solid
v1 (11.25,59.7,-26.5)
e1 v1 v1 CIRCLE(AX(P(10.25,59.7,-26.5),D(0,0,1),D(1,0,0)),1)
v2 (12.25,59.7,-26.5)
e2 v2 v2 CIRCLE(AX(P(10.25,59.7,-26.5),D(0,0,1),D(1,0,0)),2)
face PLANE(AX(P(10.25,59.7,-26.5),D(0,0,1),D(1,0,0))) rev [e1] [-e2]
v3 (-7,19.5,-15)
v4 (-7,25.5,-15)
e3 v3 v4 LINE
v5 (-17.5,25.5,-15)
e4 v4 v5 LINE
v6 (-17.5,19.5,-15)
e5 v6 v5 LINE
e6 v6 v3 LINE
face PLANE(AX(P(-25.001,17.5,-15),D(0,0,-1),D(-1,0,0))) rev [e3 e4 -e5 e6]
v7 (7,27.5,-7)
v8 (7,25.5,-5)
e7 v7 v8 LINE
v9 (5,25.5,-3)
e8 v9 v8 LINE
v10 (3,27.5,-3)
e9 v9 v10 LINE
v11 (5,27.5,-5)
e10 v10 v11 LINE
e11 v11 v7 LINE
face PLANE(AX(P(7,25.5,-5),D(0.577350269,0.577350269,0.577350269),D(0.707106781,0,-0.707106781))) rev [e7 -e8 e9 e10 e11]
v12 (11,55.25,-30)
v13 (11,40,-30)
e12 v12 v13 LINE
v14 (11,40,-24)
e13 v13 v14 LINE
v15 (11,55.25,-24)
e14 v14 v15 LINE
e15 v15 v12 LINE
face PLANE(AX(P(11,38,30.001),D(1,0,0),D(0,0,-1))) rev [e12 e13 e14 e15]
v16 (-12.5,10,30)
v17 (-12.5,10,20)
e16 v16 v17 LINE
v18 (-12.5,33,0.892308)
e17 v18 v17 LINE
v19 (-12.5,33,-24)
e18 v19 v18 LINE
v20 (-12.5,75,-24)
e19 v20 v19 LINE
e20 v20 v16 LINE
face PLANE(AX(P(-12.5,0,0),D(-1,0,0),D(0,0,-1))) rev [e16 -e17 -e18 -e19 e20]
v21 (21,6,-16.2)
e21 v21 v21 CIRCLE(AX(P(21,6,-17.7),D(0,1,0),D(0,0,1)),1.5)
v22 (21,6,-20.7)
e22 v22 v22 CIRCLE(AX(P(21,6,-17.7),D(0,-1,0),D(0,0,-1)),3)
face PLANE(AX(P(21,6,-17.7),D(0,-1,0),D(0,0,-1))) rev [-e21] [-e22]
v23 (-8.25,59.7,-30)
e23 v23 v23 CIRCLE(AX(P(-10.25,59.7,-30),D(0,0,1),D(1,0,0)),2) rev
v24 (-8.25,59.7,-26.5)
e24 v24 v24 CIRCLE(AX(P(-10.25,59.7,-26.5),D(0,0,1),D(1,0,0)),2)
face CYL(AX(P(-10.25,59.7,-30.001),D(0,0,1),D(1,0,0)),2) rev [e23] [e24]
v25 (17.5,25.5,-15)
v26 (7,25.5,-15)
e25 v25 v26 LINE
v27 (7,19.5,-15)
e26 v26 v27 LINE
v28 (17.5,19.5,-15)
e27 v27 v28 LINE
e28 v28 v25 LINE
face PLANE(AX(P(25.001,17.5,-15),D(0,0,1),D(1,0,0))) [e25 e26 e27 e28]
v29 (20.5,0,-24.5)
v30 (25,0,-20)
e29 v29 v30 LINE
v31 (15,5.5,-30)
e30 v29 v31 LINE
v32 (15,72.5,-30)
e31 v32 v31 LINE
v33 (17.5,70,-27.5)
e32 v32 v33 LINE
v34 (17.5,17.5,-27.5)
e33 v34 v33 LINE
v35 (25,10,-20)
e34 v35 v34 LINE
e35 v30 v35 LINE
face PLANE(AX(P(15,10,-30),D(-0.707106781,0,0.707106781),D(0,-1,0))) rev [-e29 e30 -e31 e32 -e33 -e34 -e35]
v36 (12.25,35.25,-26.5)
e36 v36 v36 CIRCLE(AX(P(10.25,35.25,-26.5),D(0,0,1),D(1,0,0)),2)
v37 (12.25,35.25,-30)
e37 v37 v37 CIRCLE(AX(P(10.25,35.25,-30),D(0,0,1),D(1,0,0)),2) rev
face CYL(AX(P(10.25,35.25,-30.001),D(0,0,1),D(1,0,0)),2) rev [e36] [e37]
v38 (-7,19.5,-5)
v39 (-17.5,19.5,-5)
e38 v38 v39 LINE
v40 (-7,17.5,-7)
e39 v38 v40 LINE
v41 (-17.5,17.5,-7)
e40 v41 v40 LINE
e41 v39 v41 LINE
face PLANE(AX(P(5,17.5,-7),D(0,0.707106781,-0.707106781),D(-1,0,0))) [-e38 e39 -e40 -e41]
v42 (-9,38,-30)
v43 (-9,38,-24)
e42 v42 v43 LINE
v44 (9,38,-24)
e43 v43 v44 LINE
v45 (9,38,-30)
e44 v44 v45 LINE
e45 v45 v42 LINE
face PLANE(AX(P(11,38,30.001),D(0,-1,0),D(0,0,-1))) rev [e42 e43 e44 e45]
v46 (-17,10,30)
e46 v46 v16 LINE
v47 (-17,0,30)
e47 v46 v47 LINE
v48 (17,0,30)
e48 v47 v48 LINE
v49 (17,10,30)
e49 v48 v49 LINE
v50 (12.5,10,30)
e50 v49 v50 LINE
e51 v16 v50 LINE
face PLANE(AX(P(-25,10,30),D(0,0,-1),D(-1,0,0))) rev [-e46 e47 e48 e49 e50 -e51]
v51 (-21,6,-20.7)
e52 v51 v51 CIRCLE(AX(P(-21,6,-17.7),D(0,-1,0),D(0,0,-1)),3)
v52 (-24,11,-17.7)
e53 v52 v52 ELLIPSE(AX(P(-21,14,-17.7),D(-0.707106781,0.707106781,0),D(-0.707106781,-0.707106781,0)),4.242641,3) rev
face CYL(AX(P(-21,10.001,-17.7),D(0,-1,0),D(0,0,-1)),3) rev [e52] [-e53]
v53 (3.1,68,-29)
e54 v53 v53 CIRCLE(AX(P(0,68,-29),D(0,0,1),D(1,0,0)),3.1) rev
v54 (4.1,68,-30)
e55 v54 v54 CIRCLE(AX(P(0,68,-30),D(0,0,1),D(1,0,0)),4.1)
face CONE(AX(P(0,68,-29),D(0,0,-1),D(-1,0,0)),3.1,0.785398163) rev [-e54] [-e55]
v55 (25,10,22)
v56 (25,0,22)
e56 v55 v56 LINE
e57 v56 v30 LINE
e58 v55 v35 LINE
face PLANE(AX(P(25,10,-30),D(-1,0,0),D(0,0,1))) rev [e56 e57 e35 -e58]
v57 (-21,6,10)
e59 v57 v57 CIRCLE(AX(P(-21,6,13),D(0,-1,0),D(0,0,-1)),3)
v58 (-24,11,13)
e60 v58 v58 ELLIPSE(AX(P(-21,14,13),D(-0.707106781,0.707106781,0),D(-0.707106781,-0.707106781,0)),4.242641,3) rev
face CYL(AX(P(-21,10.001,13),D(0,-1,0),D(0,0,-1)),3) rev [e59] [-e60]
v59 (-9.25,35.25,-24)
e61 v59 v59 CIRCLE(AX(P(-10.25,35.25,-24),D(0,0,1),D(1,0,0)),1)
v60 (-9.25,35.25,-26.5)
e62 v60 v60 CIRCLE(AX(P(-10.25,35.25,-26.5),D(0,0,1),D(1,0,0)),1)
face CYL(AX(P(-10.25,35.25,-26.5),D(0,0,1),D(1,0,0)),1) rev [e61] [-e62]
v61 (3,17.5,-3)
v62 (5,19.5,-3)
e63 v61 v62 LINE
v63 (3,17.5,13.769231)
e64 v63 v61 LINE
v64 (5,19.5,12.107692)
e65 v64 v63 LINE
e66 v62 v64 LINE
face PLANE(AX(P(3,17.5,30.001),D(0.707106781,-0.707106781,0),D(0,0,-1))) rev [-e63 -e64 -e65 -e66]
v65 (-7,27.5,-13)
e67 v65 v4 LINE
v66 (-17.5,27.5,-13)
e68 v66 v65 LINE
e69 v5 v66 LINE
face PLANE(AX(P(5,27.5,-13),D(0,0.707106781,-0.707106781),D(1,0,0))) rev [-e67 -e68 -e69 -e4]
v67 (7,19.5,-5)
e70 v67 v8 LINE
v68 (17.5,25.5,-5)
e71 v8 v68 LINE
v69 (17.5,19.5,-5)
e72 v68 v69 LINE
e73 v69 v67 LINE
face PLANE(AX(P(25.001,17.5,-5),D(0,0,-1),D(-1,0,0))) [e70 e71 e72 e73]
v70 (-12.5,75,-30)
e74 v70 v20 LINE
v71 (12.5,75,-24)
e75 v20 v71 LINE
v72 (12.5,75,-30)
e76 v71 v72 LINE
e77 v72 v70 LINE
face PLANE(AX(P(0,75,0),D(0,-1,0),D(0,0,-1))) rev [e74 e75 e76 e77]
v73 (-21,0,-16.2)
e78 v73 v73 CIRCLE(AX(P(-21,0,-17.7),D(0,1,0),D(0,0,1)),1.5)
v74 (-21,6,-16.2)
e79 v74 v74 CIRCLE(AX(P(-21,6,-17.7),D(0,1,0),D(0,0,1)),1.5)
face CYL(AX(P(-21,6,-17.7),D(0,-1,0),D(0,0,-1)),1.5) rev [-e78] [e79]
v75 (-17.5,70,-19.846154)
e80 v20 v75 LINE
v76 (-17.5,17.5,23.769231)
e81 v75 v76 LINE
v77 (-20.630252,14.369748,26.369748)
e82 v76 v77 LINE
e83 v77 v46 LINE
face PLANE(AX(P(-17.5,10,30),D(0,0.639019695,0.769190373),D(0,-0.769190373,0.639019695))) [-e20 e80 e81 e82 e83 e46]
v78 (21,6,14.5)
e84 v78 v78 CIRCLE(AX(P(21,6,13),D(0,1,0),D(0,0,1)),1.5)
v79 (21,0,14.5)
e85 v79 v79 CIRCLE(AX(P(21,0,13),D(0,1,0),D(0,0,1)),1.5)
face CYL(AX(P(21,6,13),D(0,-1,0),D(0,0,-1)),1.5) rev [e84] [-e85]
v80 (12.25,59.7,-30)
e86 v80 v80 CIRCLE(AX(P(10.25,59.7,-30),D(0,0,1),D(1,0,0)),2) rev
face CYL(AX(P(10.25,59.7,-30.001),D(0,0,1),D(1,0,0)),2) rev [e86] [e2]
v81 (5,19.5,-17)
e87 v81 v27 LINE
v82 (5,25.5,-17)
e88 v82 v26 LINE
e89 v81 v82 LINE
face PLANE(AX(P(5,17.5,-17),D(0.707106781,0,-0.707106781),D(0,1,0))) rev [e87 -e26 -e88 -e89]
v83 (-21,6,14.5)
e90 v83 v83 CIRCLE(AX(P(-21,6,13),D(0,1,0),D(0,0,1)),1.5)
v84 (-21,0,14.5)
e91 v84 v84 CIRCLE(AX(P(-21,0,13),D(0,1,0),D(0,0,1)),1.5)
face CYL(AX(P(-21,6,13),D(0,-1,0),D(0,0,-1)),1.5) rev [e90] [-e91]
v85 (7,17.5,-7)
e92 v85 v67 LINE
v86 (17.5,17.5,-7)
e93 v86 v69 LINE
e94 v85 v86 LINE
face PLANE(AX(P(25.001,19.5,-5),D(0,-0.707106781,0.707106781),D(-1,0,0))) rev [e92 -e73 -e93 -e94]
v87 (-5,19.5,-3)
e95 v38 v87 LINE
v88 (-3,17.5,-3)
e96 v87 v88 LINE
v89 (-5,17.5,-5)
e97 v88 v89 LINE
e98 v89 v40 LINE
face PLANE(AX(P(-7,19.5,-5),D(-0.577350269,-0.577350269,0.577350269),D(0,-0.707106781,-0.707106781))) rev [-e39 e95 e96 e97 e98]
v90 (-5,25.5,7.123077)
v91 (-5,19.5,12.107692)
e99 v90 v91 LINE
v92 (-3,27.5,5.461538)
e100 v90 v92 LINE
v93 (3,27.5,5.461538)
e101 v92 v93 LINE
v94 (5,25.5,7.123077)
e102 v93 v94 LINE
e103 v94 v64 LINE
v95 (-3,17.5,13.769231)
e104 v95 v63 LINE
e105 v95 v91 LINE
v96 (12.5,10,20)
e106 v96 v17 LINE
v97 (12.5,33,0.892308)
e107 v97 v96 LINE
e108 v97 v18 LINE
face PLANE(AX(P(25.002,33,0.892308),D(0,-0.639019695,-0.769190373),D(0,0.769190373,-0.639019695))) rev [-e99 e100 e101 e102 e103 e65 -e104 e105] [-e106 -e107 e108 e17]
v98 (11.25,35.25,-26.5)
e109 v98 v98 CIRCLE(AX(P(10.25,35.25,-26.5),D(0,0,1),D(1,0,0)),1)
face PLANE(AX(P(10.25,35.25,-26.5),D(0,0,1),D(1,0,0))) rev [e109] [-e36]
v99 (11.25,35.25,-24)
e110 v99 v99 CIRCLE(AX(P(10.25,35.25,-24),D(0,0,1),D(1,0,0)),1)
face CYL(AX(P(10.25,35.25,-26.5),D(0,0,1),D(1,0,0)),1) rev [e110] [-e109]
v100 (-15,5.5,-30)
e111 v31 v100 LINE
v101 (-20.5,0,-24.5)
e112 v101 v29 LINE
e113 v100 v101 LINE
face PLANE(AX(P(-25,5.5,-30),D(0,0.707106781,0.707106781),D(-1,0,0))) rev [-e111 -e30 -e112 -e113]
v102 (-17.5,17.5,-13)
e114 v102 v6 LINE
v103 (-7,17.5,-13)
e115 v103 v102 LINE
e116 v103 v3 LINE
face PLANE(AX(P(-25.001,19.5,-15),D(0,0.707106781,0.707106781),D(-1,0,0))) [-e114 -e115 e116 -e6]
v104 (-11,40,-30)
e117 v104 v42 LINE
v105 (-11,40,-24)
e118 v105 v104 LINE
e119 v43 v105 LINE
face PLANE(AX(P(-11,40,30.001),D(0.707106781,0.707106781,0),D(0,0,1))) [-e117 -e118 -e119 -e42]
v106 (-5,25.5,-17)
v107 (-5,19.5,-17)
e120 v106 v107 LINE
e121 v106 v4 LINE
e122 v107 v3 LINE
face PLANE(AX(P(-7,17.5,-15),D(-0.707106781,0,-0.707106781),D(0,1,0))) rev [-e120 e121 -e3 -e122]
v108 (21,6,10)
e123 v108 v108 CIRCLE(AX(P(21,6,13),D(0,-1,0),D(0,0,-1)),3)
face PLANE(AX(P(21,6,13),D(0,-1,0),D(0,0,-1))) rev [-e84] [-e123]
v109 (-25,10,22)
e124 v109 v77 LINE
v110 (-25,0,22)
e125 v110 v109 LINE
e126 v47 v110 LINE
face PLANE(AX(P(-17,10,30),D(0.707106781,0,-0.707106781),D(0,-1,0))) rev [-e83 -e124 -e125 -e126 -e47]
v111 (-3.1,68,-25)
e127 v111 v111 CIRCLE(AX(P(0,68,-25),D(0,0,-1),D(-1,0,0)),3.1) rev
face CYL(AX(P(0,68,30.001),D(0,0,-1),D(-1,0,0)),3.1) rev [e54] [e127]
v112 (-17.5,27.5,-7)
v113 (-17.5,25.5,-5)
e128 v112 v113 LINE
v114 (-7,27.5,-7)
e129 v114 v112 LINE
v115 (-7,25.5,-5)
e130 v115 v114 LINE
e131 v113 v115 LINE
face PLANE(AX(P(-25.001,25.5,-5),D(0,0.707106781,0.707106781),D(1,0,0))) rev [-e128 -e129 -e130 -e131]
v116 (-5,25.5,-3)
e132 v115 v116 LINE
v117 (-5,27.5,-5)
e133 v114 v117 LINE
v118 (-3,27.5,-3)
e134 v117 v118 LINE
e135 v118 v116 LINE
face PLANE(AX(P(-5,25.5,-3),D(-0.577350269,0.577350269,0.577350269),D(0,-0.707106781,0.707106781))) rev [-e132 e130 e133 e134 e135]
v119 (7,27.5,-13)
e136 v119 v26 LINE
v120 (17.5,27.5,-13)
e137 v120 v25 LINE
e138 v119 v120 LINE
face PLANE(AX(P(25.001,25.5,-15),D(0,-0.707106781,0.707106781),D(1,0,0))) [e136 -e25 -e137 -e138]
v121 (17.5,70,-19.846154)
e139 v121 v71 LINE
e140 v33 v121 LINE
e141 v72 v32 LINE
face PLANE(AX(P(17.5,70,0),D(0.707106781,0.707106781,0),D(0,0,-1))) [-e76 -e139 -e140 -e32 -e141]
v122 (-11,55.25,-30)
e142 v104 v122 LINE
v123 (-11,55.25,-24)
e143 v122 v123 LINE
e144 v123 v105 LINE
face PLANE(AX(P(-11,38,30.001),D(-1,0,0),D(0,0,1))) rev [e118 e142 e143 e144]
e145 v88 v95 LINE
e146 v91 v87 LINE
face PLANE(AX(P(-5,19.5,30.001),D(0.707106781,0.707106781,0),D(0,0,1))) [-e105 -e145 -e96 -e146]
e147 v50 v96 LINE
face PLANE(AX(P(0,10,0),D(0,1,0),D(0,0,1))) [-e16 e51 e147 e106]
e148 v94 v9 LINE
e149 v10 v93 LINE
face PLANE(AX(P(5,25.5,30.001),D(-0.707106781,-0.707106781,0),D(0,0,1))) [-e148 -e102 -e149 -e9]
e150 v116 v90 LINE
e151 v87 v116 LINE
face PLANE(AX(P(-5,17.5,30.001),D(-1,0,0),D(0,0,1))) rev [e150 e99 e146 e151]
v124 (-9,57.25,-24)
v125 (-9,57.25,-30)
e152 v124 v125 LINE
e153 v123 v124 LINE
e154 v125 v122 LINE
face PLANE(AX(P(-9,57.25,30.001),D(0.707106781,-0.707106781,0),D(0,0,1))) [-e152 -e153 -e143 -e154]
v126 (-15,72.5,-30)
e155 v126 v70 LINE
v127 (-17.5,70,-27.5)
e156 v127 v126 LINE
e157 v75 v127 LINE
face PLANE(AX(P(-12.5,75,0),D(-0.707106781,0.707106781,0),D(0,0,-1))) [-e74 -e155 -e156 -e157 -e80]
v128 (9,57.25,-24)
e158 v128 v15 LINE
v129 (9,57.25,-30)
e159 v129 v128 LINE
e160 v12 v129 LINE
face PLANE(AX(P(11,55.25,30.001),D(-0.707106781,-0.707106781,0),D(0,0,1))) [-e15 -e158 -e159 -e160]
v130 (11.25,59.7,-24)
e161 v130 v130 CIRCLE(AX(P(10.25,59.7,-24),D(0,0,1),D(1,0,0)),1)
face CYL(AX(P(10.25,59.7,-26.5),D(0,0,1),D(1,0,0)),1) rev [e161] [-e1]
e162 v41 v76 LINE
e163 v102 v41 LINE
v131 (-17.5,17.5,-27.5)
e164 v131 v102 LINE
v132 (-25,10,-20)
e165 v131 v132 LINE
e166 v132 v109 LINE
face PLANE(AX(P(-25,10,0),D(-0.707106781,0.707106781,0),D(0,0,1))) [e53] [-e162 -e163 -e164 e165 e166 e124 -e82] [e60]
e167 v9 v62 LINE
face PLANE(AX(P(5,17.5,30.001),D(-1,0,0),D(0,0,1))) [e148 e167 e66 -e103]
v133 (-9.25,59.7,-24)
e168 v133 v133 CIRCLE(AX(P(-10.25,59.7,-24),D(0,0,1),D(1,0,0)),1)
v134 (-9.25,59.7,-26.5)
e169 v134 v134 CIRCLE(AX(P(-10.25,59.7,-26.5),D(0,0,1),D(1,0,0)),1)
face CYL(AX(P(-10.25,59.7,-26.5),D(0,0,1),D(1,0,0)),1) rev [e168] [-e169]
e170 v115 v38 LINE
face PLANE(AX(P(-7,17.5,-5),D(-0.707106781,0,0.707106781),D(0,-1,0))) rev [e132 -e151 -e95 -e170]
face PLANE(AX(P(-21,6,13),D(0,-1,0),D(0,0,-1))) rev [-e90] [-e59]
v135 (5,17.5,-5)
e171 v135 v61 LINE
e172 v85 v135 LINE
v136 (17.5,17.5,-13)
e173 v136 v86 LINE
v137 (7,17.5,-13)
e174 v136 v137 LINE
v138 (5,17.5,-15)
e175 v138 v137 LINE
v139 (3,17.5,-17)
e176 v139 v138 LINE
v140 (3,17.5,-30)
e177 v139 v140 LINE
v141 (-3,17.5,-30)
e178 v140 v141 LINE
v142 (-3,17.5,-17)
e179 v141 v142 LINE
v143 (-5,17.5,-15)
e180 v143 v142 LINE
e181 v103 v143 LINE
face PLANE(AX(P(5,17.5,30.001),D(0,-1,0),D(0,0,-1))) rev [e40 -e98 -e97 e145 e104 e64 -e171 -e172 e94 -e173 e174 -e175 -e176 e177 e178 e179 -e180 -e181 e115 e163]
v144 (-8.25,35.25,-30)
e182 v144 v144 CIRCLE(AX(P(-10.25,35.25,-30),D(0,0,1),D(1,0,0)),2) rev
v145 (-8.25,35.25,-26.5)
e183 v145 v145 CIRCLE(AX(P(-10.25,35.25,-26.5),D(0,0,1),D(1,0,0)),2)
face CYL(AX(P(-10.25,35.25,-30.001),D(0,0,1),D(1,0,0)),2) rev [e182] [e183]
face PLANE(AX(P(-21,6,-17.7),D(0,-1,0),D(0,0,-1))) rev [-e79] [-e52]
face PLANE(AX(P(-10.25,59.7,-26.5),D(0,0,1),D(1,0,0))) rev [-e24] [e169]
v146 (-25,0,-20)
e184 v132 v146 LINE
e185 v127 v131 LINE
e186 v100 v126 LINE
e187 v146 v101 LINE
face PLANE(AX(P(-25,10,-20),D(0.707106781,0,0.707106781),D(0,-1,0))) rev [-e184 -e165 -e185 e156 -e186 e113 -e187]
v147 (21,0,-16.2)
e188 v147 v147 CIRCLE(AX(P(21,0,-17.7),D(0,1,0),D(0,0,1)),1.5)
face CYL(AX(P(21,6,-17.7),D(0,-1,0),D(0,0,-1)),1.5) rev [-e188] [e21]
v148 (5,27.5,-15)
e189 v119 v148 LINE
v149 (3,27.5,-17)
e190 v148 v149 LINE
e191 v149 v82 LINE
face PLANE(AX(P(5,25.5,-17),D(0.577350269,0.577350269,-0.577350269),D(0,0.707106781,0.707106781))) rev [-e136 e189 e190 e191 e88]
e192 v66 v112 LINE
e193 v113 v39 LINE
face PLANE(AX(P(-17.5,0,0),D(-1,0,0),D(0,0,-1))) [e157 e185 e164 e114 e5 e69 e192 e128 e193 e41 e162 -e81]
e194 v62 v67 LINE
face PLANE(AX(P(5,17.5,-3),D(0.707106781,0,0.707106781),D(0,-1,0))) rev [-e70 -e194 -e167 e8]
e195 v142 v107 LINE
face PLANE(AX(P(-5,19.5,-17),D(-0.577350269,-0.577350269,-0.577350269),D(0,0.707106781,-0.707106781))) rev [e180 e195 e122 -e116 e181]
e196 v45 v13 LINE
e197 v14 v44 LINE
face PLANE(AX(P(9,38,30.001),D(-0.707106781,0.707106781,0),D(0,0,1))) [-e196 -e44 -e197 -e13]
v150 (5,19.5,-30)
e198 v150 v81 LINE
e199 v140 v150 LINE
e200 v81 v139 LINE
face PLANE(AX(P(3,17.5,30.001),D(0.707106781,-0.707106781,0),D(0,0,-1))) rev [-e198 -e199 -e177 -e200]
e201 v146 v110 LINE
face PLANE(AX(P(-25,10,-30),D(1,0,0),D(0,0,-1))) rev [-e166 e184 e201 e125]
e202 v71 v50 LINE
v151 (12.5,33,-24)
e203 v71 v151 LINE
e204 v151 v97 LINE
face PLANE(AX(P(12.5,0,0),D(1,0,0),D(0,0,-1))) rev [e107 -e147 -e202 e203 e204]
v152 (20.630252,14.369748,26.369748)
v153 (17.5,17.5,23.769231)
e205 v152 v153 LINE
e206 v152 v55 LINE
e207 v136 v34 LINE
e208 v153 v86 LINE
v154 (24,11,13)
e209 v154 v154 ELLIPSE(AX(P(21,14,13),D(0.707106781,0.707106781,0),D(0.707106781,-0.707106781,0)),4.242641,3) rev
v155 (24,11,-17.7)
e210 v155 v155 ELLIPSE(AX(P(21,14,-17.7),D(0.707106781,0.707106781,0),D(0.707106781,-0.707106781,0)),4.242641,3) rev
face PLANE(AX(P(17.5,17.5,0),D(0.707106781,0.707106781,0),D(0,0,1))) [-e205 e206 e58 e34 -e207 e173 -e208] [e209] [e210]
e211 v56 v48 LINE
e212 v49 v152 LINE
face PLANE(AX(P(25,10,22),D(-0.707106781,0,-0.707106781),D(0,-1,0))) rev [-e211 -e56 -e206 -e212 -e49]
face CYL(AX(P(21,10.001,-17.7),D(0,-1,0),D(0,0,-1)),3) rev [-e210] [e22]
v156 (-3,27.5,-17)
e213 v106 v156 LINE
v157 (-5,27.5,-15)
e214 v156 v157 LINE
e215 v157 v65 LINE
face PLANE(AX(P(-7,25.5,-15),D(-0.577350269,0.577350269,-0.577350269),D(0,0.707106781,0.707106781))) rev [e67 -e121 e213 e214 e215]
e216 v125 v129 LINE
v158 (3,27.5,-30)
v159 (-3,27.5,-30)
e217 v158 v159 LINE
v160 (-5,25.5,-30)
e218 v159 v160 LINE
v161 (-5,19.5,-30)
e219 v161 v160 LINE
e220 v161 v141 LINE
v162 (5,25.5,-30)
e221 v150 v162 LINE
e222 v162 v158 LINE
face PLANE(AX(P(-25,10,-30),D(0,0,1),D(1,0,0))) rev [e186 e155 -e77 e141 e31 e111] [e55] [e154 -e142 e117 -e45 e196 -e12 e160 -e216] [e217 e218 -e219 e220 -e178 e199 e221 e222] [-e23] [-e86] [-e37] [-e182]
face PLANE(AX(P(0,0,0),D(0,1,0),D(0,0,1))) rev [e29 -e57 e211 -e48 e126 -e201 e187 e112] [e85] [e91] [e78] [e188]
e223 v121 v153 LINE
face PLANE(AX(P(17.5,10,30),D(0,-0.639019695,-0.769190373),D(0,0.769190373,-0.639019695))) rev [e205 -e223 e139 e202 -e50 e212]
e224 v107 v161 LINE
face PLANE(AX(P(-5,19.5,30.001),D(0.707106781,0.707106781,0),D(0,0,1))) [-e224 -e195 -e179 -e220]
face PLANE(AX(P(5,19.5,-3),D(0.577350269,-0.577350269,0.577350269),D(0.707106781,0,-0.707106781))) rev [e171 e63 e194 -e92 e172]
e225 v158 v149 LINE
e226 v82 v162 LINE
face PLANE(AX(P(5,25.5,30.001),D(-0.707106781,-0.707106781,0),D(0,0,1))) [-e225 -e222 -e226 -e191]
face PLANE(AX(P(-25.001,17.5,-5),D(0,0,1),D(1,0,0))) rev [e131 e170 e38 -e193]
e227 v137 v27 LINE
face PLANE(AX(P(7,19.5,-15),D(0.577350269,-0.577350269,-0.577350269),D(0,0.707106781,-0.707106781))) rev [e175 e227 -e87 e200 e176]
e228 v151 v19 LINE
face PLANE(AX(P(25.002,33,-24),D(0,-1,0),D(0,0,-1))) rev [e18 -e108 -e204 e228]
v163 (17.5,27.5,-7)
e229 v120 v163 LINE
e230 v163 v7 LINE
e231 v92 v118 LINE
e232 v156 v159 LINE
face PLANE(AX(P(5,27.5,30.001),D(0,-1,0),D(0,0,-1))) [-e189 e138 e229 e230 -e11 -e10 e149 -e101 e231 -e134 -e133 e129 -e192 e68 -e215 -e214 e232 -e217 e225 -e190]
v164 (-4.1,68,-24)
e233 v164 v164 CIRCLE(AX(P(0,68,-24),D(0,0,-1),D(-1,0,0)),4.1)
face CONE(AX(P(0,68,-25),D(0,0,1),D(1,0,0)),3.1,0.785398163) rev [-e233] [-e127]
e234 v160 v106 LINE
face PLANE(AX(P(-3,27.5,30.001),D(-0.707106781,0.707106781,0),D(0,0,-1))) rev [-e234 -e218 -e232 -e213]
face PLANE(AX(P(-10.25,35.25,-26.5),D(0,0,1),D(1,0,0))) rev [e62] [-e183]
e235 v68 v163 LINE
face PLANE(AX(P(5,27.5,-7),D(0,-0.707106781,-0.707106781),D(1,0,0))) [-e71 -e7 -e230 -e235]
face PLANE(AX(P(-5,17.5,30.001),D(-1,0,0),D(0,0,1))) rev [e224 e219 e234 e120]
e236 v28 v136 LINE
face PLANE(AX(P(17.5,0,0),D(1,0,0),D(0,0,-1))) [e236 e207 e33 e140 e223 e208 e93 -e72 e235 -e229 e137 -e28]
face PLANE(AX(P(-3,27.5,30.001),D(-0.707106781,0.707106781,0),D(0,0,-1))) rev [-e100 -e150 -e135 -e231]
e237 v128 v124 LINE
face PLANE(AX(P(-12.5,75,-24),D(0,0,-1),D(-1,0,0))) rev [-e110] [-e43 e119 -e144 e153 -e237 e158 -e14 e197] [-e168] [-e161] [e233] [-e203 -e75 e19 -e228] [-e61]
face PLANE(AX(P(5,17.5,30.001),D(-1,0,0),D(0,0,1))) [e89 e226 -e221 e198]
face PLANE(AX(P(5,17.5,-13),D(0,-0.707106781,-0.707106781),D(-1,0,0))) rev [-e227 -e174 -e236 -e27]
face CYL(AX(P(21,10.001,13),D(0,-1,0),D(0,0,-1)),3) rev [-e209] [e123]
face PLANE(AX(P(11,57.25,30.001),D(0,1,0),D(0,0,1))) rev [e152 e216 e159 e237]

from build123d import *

# Parameters (mm, degrees)
SKETCH1_W           = 50
SKETCH1_H           = 60
BOSS_EXTRUDE1_DEPTH = 10
SKETCH2_R           = 1.5
CUT_EXTRUDE1_DEPTH  = 6
CUT_EXTRUDE2_REACH  = 41.509
SKETCH3_R           = 3
SKETCH5_W           = 25
SKETCH5_H           = 6
BOSS_EXTRUDE3_DEPTH = 65
CUT_EXTRUDE3_REACH  = 101.247
SKETCH6_W           = 22
SKETCH6_H           = 19.25
SKETCH7_R           = 1
CUT_EXTRUDE4_DEPTH  = 2.5
CUT_EXTRUDE5_REACH  = 99.171
SKETCH8_R           = 2
BOSS_EXTRUDE4_DEPTH = 5
CHAMFER1_SIZE       = 7.5
CHAMFER2_SIZE       = 10
CHAMFER4_SIZE       = 5.5
CHAMFER5_SIZE       = 5
CHAMFER7_SIZE       = 2
CUT_EXTRUDE6_REACH  = 101.247
SKETCH10_R          = 3.1
CHAMFER8_SIZE       = 1
BOSS_EXTRUDE5_REACH = 91.058
CHAMFER9_SIZE       = 8
CUT_EXTRUDE7_REACH  = 101.247
SKETCH12_W          = 10
SKETCH12_H          = 10
CUT_EXTRUDE9_REACH  = 88.168
SKETCH14_W          = 10
SKETCH14_H          = 10
CHAMFER11_SIZE      = 2


with BuildPart() as part:
    # Sketch1 → Boss-Extrude1 (new body)
    with BuildSketch(Plane(origin=(0, 0, 0), x_dir=(1, 0, 0), z_dir=(0, 1, 0))):
        Rectangle(SKETCH1_W, SKETCH1_H)
    extrude(amount=BOSS_EXTRUDE1_DEPTH)

    # Sketch2 → Cut-Extrude1 (cut)
    with BuildSketch(Plane(origin=(0, 0, 0), x_dir=(1, 0, 0), z_dir=(0, 1, 0))):
        with Locations(Location((-21, 17.7, 0), (0, 0, 270))):
            Circle(SKETCH2_R)
        with Locations(Location((-21, -13, 0), (0, 0, 270))):
            Circle(SKETCH2_R)
        with Locations(Location((21, 17.7, 0), (0, 0, 270))):
            Circle(SKETCH2_R)
        with Locations(Location((21, -13, 0), (0, 0, 270))):
            Circle(SKETCH2_R)
    extrude(amount=CUT_EXTRUDE1_DEPTH, mode=Mode.SUBTRACT)

    # Sketch3 → Cut-Extrude2 (cut, up to next)
    with BuildSketch(Plane.XZ.offset(-6), mode=Mode.PRIVATE) as cut_extrude2_sk1:
        with Locations(Location((-21, 13, 0), (0, 0, 270))):
            Circle(SKETCH3_R)
    cut_extrude2_tool1 = extrude(cut_extrude2_sk1.sketch, amount=-CUT_EXTRUDE2_REACH, mode=Mode.PRIVATE) & part.part
    # Sketch3 → Cut-Extrude2 (cut, up to next)
    with BuildSketch(Plane.XZ.offset(-6), mode=Mode.PRIVATE) as cut_extrude2_sk2:
        with Locations(Location((21, 13, 0), (0, 0, 270))):
            Circle(SKETCH3_R)
    cut_extrude2_tool2 = extrude(cut_extrude2_sk2.sketch, amount=-CUT_EXTRUDE2_REACH, mode=Mode.PRIVATE) & part.part
    # Sketch3 → Cut-Extrude2 (cut, up to next)
    with BuildSketch(Plane.XZ.offset(-6), mode=Mode.PRIVATE) as cut_extrude2_sk3:
        with Locations(Location((21, -17.7, 0), (0, 0, 270))):
            Circle(SKETCH3_R)
    cut_extrude2_tool3 = extrude(cut_extrude2_sk3.sketch, amount=-CUT_EXTRUDE2_REACH, mode=Mode.PRIVATE) & part.part
    # Sketch3 → Cut-Extrude2 (cut, up to next)
    with BuildSketch(Plane.XZ.offset(-6), mode=Mode.PRIVATE) as cut_extrude2_sk4:
        with Locations(Location((-21, -17.7, 0), (0, 0, 270))):
            Circle(SKETCH3_R)
    cut_extrude2_tool4 = extrude(cut_extrude2_sk4.sketch, amount=-CUT_EXTRUDE2_REACH, mode=Mode.PRIVATE) & part.part
    add(cut_extrude2_tool1.solids().sort_by_distance((-21, 6, 13))[0], mode=Mode.SUBTRACT)
    add(cut_extrude2_tool2.solids().sort_by_distance((21, 6, 13))[0], mode=Mode.SUBTRACT)
    add(cut_extrude2_tool3.solids().sort_by_distance((21, 6, -17.7))[0], mode=Mode.SUBTRACT)
    add(cut_extrude2_tool4.solids().sort_by_distance((-21, 6, -17.7))[0], mode=Mode.SUBTRACT)

    # Sketch5 → Boss-Extrude3 (add)
    with BuildSketch(Plane(origin=(0, 10, 0), x_dir=(1, 0, 0), z_dir=(0, 1, 0))):
        with Locations((0, 27)):
            Rectangle(SKETCH5_W, SKETCH5_H)
    extrude(amount=BOSS_EXTRUDE3_DEPTH)

    # Sketch6 → Cut-Extrude3 (cut, up to next)
    with BuildSketch(Plane(origin=(0, 0, -30), x_dir=(-1, 0, 0), z_dir=(0, 0, -1)), mode=Mode.PRIVATE) as cut_extrude3_sk1:
        with Locations((0, 47.625)):
            Rectangle(SKETCH6_W, SKETCH6_H)
    cut_extrude3_tool1 = extrude(cut_extrude3_sk1.sketch, amount=-CUT_EXTRUDE3_REACH, mode=Mode.PRIVATE) & part.part
    add(cut_extrude3_tool1.solids().sort_by_distance((0, 47.625, -30))[0], mode=Mode.SUBTRACT)

    # Sketch7 → Cut-Extrude4 (cut)
    with BuildSketch(Plane.XY.offset(-24)):
        with Locations((10.25, 35.25)):
            Circle(SKETCH7_R)
        with Locations((-10.25, 35.25)):
            Circle(SKETCH7_R)
        with Locations((-10.25, 59.7)):
            Circle(SKETCH7_R)
        with Locations((10.25, 59.7)):
            Circle(SKETCH7_R)
    extrude(amount=-CUT_EXTRUDE4_DEPTH, mode=Mode.SUBTRACT)

    # Sketch8 → Cut-Extrude5 (cut, up to next)
    with BuildSketch(Plane.XY.offset(-26.5), mode=Mode.PRIVATE) as cut_extrude5_sk1:
        with Locations((-10.25, 59.7)):
            Circle(SKETCH8_R)
    cut_extrude5_tool1 = extrude(cut_extrude5_sk1.sketch, amount=-CUT_EXTRUDE5_REACH, mode=Mode.PRIVATE) & part.part
    # Sketch8 → Cut-Extrude5 (cut, up to next)
    with BuildSketch(Plane.XY.offset(-26.5), mode=Mode.PRIVATE) as cut_extrude5_sk2:
        with Locations((10.25, 59.7)):
            Circle(SKETCH8_R)
    cut_extrude5_tool2 = extrude(cut_extrude5_sk2.sketch, amount=-CUT_EXTRUDE5_REACH, mode=Mode.PRIVATE) & part.part
    # Sketch8 → Cut-Extrude5 (cut, up to next)
    with BuildSketch(Plane.XY.offset(-26.5), mode=Mode.PRIVATE) as cut_extrude5_sk3:
        with Locations((10.25, 35.25)):
            Circle(SKETCH8_R)
    cut_extrude5_tool3 = extrude(cut_extrude5_sk3.sketch, amount=-CUT_EXTRUDE5_REACH, mode=Mode.PRIVATE) & part.part
    # Sketch8 → Cut-Extrude5 (cut, up to next)
    with BuildSketch(Plane.XY.offset(-26.5), mode=Mode.PRIVATE) as cut_extrude5_sk4:
        with Locations((-10.25, 35.25)):
            Circle(SKETCH8_R)
    cut_extrude5_tool4 = extrude(cut_extrude5_sk4.sketch, amount=-CUT_EXTRUDE5_REACH, mode=Mode.PRIVATE) & part.part
    add(cut_extrude5_tool1.solids().sort_by_distance((-10.25, 59.7, -26.5))[0], mode=Mode.SUBTRACT)
    add(cut_extrude5_tool2.solids().sort_by_distance((10.25, 59.7, -26.5))[0], mode=Mode.SUBTRACT)
    add(cut_extrude5_tool3.solids().sort_by_distance((10.25, 35.25, -26.5))[0], mode=Mode.SUBTRACT)
    add(cut_extrude5_tool4.solids().sort_by_distance((-10.25, 35.25, -26.5))[0], mode=Mode.SUBTRACT)

    # Sketch9 → Boss-Extrude4 (add)
    with BuildSketch(Plane(origin=(12.5, 0, 0), x_dir=(0, 0, -1), z_dir=(1, 0, 0))):
        Polygon((30, 75), (24, 75), (-30, 10), (30, 10), align=None)
    boss_extrude4 = extrude(amount=BOSS_EXTRUDE4_DEPTH)

    # Mirror1: Boss-Extrude4 across plane
    add(boss_extrude4.mirror(Plane(origin=(0, 0, 0), x_dir=(0, 0, 1), z_dir=(1, 0, 0))))

    # Chamfer1
    # the kernel refuses this chamfer: 7.5 mm, written as the material it adds along each edge
    with BuildSketch(Plane(origin=(17.5, 10, 30), x_dir=(0.9996219169112968, -0.02749587661058632, 0), z_dir=(0, 0, -1))) as chamfer1_piece_1_section:
        Polygon((CHAMFER1_SIZE * 0.999621916911, -CHAMFER1_SIZE * 0.0274958766106), (-CHAMFER1_SIZE * 0.0274958766106, -CHAMFER1_SIZE * 0.999621916911), (0, 0), align=None)
    chamfer1_piece_1 = extrude(amount=60, mode=Mode.PRIVATE)
    chamfer1_piece_1 = split(chamfer1_piece_1, bisect_by=Plane(origin=(19.919237696, 26.599778663, 16.209414649), z_dir=(0, -0.6390196945354667, -0.7691903730519506)), keep=Keep.TOP, mode=Mode.PRIVATE)
    chamfer1_piece_1 = chamfer1_piece_1 - Plane(origin=(21, 12.462621572, -17.7), x_dir=(0, 0, -1), z_dir=(0, -1, 0)) * Cylinder(3, 150, mode=Mode.PRIVATE)
    chamfer1_piece_1 = chamfer1_piece_1 - Plane(origin=(21, 12.462621572, 13), x_dir=(0, 0, -1), z_dir=(0, -1, 0)) * Cylinder(3, 150, mode=Mode.PRIVATE)
    chamfer1_piece_1 = split(chamfer1_piece_1, bisect_by=Plane(origin=(25, 12.462621572, -0.807533702), z_dir=(-1, 0, 0)), keep=Keep.TOP, mode=Mode.PRIVATE)
    add(chamfer1_piece_1)
    with BuildSketch(Plane(origin=(-17.5, 10, 30), x_dir=(0.02749587661058632, 0.9996219169112968, 0), z_dir=(0, 0, -1))) as chamfer1_piece_2_section:
        Polygon((CHAMFER1_SIZE * 0.999621916911, -CHAMFER1_SIZE * 0.0274958766106), (-CHAMFER1_SIZE * 0.0274958766106, -CHAMFER1_SIZE * 0.999621916911), (0, 0), align=None)
    chamfer1_piece_2 = extrude(amount=60, mode=Mode.PRIVATE)
    chamfer1_piece_2 = split(chamfer1_piece_2, bisect_by=Plane(origin=(-19.919241024, 26.599776134, 16.209416751), z_dir=(0, -0.6390196945354667, -0.7691903730519506)), keep=Keep.TOP, mode=Mode.PRIVATE)
    chamfer1_piece_2 = chamfer1_piece_2 - Plane(origin=(-21, 12.462621922, -17.7), x_dir=(0, 0, -1), z_dir=(0, -1, 0)) * Cylinder(3, 150, mode=Mode.PRIVATE)
    chamfer1_piece_2 = chamfer1_piece_2 - Plane(origin=(-21, 12.462621922, 13), x_dir=(0, 0, -1), z_dir=(0, -1, 0)) * Cylinder(3, 150, mode=Mode.PRIVATE)
    chamfer1_piece_2 = split(chamfer1_piece_2, bisect_by=Plane(origin=(-25, 12.462621922, -0.807528134), z_dir=(1, 0, 0)), keep=Keep.TOP, mode=Mode.PRIVATE)
    add(chamfer1_piece_2)

    # Chamfer2
    chamfer2_edges = [part.edges().sort_by_distance(p)[0] for p in [
        (-25, 5, -30),
        (25, 5, -30),
    ]]
    chamfer(chamfer2_edges, length=CHAMFER2_SIZE)

    # Chamfer4
    chamfer4_edges = [part.edges().sort_by_distance(p)[0] for p in [
        (0, 0, -30),
    ]]
    chamfer(chamfer4_edges, length=CHAMFER4_SIZE)

    # Chamfer5
    chamfer5_edges = [part.edges().sort_by_distance(p)[0] for p in [
        (17.5, 75, -25.75),
        (-17.5, 75, -25.75),
    ]]
    chamfer(chamfer5_edges, length=CHAMFER5_SIZE)

    # Chamfer7
    chamfer7_edges = [part.edges().sort_by_distance(p)[0] for p in [
        (-11, 57.25, -27),
        (-11, 38, -27),
        (11, 38, -27),
        (11, 57.25, -27),
    ]]
    chamfer(chamfer7_edges, length=CHAMFER7_SIZE)

    # Sketch10 → Cut-Extrude6 (cut, up to next)
    with BuildSketch(Plane(origin=(0, 0, -30), x_dir=(-1, 0, 0), z_dir=(0, 0, -1)), mode=Mode.PRIVATE) as cut_extrude6_sk1:
        with Locations((0, 68)):
            Circle(SKETCH10_R)
    cut_extrude6_tool1 = extrude(cut_extrude6_sk1.sketch, amount=-CUT_EXTRUDE6_REACH, mode=Mode.PRIVATE) & part.part
    add(cut_extrude6_tool1.solids().sort_by_distance((0, 68, -30))[0], mode=Mode.SUBTRACT)

    # Chamfer8
    chamfer8_edges = [part.edges().sort_by_distance(p)[0] for p in [
        (3.1, 68, -30),
        (3.1, 68, -24),
    ]]
    chamfer(chamfer8_edges, length=CHAMFER8_SIZE)

    # Sketch11 → Boss-Extrude5 (add, up to next)
    with BuildSketch(Plane(origin=(-12.5, 0, 0), x_dir=(0, 0, -1), z_dir=(1, 0, 0)), mode=Mode.PRIVATE) as boss_extrude5_sk1:
        Polygon((-20, 10), (24, 10), (24, 33), (-0.892307692, 33), align=None)
    boss_extrude5_tool1 = extrude(boss_extrude5_sk1.sketch, amount=BOSS_EXTRUDE5_REACH, mode=Mode.PRIVATE) - part.part
    add(boss_extrude5_tool1.solids().sort_by_distance((-12.5, 20.436802, -6.335287))[0])

    # Chamfer9
    chamfer9_edges = [part.edges().sort_by_distance(p)[0] for p in [
        (25, 5, 30),
        (-25, 5, 30),
    ]]
    chamfer(chamfer9_edges, length=CHAMFER9_SIZE)

    # Cut-Extrude7: up to this plane
    cut_extrude7_end = Plane(origin=(25.002, 33, 0.892307692), z_dir=(0, -0.6390196945354668, -0.7691903730519506))
    # Sketch12 → Cut-Extrude7 (cut, up to the surface)
    with BuildSketch(Plane(origin=(0, 0, -30), x_dir=(-1, 0, 0), z_dir=(0, 0, -1)), mode=Mode.PRIVATE) as cut_extrude7_sk1:
        with Locations((0, 22.5)):
            Rectangle(SKETCH12_W, SKETCH12_H)
    cut_extrude7_tool1 = split(extrude(cut_extrude7_sk1.sketch, amount=-CUT_EXTRUDE7_REACH, mode=Mode.PRIVATE), bisect_by=cut_extrude7_end, keep=Keep.BOTH, mode=Mode.PRIVATE)
    add(cut_extrude7_tool1.solids().sort_by_distance((0, 22.5, -30))[0], mode=Mode.SUBTRACT)

    # Sketch14 → Cut-Extrude9 (cut, up to next)
    with BuildSketch(Plane(origin=(-5, 0, 0), x_dir=(0, 0, -1), z_dir=(1, 0, 0)), mode=Mode.PRIVATE) as cut_extrude9_sk1:
        with Locations((10, 22.5)):
            Rectangle(SKETCH14_W, SKETCH14_H)
    cut_extrude9_tool1 = extrude(cut_extrude9_sk1.sketch, amount=-CUT_EXTRUDE9_REACH, mode=Mode.PRIVATE) & part.part
    cut_extrude9 = cut_extrude9_tool1.solids().sort_by_distance((-5, 22.5, -10))[0]
    add(cut_extrude9, mode=Mode.SUBTRACT)

    # Mirror2: Cut-Extrude9 across plane
    add(cut_extrude9.mirror(Plane(origin=(0, 0, 0), x_dir=(0, 0, 1), z_dir=(1, 0, 0))), mode=Mode.SUBTRACT)

    # Chamfer11
    chamfer11_edges = [part.edges().sort_by_distance(p)[0] for p in [
        (-5, 17.5, 4.384615385),
        (5, 17.5, 4.384615385),
        (5, 27.5, 0.230769231),
        (-5, 27.5, 0.230769231),
        (-5, 17.5, -22.5),
        (-5, 27.5, -22.5),
        (-11.25, 17.5, -15),
        (-11.25, 27.5, -15),
        (-11.25, 17.5, -5),
        (-11.25, 27.5, -5),
        (-5, 22.5, -15),
        (-5, 22.5, -5),
        (5, 27.5, -22.5),
        (5, 17.5, -22.5),
        (11.25, 17.5, -5),
        (11.25, 17.5, -15),
        (5, 22.5, -15),
        (11.25, 27.5, -15),
        (11.25, 27.5, -5),
        (5, 22.5, -5),
    ]]
    chamfer(chamfer11_edges, length=CHAMFER11_SIZE)


solid = part.part
